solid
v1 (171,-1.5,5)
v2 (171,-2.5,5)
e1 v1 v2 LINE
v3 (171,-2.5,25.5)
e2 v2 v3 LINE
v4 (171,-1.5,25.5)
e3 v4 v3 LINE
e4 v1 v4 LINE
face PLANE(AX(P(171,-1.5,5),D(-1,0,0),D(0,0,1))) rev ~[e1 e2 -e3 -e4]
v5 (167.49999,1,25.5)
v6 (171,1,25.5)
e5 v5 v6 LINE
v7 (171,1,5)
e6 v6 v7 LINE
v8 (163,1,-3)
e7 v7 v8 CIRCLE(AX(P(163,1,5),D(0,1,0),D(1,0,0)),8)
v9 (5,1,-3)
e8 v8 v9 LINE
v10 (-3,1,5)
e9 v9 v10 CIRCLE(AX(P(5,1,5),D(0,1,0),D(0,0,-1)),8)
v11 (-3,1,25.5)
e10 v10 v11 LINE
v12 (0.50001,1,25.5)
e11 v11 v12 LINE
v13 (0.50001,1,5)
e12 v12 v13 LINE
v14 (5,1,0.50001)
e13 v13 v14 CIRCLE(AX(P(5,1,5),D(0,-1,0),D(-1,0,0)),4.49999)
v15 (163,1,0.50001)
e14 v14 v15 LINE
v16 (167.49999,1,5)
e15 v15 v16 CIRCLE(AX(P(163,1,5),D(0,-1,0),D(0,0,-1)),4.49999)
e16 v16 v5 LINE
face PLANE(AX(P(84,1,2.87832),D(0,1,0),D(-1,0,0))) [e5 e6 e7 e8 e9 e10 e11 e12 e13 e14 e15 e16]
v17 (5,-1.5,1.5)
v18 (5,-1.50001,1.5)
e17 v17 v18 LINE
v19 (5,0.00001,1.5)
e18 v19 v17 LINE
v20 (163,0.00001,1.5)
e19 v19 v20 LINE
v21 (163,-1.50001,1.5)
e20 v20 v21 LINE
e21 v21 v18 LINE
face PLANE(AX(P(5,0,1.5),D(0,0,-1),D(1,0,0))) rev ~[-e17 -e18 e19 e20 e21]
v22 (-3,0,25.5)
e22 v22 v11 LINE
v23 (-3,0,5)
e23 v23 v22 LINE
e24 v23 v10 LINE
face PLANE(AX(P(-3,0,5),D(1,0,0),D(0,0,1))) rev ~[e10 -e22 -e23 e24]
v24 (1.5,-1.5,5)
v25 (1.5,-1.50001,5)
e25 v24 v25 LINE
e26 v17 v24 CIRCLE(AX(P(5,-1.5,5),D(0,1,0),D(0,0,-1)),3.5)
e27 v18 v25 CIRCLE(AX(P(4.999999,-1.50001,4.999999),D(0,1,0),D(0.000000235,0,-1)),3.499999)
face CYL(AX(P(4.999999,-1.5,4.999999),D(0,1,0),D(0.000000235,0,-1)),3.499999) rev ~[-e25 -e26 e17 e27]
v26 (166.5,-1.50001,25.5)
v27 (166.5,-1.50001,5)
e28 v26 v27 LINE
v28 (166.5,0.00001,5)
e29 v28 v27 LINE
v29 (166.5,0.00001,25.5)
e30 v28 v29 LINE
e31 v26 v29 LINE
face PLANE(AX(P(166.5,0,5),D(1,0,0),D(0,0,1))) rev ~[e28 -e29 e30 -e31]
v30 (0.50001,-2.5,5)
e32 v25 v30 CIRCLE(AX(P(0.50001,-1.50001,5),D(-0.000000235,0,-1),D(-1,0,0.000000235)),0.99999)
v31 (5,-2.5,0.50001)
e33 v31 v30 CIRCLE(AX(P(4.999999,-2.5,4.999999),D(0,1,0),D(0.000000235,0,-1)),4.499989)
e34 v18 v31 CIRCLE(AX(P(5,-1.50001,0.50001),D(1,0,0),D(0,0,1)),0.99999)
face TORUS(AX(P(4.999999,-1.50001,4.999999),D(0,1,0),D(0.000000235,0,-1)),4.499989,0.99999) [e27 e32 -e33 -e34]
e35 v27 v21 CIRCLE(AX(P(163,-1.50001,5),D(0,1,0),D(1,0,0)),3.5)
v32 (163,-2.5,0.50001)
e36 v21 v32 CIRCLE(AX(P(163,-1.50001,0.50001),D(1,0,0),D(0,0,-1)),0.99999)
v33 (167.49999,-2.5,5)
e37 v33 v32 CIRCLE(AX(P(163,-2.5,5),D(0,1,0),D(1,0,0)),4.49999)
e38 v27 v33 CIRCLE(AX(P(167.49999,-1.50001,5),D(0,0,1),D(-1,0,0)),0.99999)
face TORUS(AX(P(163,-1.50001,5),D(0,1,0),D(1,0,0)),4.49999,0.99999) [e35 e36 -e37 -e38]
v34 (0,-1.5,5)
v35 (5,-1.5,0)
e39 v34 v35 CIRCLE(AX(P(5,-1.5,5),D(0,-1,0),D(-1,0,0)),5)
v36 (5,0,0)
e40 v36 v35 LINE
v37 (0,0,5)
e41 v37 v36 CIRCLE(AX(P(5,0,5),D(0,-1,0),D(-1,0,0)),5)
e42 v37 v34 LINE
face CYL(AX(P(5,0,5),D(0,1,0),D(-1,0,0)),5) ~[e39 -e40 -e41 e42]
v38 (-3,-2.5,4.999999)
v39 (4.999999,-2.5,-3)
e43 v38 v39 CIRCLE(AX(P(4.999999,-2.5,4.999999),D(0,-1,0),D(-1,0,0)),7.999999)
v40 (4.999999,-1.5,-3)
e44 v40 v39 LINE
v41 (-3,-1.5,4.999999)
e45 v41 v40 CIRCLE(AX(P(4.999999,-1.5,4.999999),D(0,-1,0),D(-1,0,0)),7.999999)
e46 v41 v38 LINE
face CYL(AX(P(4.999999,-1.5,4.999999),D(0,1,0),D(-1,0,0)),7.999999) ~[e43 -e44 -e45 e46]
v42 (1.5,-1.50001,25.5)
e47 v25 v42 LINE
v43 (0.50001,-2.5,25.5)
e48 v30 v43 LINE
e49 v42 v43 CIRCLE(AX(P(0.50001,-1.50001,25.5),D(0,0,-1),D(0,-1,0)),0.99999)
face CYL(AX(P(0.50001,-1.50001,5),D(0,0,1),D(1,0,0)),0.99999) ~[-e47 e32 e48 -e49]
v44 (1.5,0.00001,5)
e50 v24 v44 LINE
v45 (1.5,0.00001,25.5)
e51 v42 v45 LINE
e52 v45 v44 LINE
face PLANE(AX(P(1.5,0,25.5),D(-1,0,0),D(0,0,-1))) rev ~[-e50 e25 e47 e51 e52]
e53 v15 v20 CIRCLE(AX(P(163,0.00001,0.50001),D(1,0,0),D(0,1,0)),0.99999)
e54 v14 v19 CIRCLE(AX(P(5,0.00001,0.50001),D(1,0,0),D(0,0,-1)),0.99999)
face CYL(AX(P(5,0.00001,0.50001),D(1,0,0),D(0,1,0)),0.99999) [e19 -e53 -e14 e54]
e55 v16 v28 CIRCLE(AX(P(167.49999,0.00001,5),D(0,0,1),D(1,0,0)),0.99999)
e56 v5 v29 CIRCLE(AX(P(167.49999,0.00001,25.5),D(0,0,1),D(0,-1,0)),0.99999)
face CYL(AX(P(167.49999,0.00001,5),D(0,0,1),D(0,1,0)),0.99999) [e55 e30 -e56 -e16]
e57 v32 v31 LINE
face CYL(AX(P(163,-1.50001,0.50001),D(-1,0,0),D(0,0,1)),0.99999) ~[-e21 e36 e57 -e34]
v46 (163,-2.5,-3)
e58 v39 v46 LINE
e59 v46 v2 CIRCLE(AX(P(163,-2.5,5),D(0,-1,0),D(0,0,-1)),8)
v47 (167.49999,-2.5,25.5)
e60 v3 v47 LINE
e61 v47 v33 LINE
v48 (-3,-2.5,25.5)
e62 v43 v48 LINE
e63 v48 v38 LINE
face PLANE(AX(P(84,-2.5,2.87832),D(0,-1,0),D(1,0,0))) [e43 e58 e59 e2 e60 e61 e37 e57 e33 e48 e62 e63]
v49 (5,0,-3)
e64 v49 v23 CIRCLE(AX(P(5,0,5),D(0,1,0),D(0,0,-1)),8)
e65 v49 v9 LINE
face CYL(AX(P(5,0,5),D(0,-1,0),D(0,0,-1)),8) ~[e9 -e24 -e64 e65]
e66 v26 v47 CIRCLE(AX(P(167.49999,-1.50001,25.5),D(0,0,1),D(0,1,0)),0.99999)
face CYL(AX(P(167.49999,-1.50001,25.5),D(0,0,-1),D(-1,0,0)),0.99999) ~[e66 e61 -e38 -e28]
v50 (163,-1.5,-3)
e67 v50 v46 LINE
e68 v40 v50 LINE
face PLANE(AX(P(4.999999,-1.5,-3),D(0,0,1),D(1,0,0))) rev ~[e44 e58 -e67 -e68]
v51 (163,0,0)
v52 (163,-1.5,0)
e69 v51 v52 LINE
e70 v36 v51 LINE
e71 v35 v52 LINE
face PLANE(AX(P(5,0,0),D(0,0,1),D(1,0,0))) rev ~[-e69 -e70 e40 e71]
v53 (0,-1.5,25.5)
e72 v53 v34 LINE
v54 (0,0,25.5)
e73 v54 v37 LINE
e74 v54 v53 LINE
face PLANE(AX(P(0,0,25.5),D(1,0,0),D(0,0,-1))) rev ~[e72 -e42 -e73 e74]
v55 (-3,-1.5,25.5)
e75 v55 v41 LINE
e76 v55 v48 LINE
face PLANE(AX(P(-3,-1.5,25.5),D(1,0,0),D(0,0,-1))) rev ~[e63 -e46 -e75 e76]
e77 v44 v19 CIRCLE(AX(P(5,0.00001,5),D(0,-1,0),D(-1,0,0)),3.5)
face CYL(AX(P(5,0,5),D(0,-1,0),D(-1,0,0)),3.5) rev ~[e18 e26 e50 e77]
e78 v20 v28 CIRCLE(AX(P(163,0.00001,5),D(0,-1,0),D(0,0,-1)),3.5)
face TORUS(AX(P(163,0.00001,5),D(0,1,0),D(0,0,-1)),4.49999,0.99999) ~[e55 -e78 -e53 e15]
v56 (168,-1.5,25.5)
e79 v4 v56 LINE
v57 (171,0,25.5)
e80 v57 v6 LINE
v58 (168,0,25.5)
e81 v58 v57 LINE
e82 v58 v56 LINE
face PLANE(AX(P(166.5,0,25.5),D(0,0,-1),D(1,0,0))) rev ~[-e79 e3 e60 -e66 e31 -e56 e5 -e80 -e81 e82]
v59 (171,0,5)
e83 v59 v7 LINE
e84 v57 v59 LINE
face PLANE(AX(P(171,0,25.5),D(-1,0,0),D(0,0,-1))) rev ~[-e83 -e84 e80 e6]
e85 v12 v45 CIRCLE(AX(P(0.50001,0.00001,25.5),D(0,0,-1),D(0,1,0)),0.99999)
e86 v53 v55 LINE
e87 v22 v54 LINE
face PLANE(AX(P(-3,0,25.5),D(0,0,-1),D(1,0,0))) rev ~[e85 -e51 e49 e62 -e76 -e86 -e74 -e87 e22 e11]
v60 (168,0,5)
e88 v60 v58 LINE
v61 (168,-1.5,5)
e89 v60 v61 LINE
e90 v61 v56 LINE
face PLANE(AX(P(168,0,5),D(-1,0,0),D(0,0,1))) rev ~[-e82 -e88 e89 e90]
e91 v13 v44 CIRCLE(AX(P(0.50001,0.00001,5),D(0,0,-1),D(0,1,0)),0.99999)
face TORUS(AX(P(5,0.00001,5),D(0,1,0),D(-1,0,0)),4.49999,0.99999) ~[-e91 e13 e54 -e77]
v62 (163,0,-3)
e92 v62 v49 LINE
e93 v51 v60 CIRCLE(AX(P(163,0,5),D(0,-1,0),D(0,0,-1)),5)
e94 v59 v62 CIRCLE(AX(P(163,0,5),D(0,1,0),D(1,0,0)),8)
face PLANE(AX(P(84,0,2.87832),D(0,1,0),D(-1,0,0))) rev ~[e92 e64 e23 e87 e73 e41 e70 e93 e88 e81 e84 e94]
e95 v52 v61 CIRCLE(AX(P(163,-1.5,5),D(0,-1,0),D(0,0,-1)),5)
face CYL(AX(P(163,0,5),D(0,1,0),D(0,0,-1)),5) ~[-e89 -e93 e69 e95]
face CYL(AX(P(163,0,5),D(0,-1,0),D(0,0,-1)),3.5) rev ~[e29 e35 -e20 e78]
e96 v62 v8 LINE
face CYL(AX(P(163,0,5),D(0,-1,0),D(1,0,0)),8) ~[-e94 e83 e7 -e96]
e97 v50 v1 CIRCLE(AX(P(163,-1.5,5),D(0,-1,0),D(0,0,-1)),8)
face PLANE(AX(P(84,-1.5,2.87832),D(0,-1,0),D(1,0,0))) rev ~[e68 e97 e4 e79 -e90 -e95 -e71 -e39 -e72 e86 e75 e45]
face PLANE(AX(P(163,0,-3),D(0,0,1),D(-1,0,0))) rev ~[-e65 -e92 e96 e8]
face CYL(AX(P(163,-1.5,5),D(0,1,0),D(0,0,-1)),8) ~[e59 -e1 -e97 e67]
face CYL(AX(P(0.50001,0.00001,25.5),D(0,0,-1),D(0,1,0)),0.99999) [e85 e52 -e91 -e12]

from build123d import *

# Parameters (mm, degrees)
F1_DEPTH = 1.5
F3_DEPTH = 1
F5_DEPTH = 1
F6_R     = 0.99999


# Not quite as in the source:
# - a fillet or chamfer is up to 0.001 mm smaller than in the source, because OpenCascade refuses the exact size
# - ends of sketch curves that miss each other by under 0.0002 mm in the source are joined


with BuildPart() as f1:
    # F0 (on Front) → F1 (new body)
    with BuildSketch(Plane.XZ):
        with BuildLine():
            Line((1.5, 25.5), (0, 25.5))
            Line((0, 25.5), (0, 5))
            ThreePointArc((0, 5), (1.4644660941, 1.4644660941), (5, 0))
            Line((5, 0), (163, 0))
            ThreePointArc((163, 0), (166.5355339059, 1.4644660941), (168, 5))
            Line((168, 5), (168, 25.5))
            Line((168, 25.5), (166.5, 25.5))
            Line((166.5, 25.5), (166.5, 5))
            ThreePointArc((166.5, 5), (165.4748737342, 2.5251262658), (163, 1.5))
            Line((163, 1.5), (5, 1.5))
            ThreePointArc((5, 1.5), (2.5251262658, 2.5251262658), (1.5, 5))
            Line((1.5, 5), (1.5, 25.5))
        make_face()
    extrude(amount=F1_DEPTH)

    # F2 (on face) → F3 (join)
    with BuildSketch(Plane.XZ.offset(1.5)):
        with BuildLine():
            Line((1.5, 5), (1.5, 25.5))
            Line((1.5, 25.5), (-3, 25.5))
            Line((-3, 25.5), (-3, 4.9999991791))
            ThreePointArc((-3, 4.9999991791), (-0.6568544899, -0.6568544899), (4.9999991791, -3))
            Line((4.9999991791, -3), (163, -3))
            ThreePointArc((163, -3), (168.6568542495, -0.6568542495), (171, 5))
            Line((171, 5), (171, 25.5))
            Line((171, 25.5), (166.5, 25.5))
            Line((166.5, 25.5), (166.5, 5))
            ThreePointArc((166.5, 5), (165.4748737342, 2.5251262658), (163, 1.5))
            Line((163, 1.5), (5, 1.5))
            ThreePointArc((5, 1.5), (2.5251257352, 2.5251263156), (1.5, 5))
        make_face()
    extrude(amount=F3_DEPTH)

    # F4 (on face) → F5 (join)
    with BuildSketch(Plane(origin=(0, 0, 0), x_dir=(-1, 0, 0), z_dir=(0, 1, 0))):
        with BuildLine():
            Line((-166.5, 5), (-166.5, 25.5))
            Line((-166.5, 25.5), (-171, 25.5))
            Line((-171, 25.5), (-171, 5))
            ThreePointArc((-171, 5), (-168.6568542495, -0.6568542495), (-163, -3))
            Line((-163, -3), (-5, -3))
            ThreePointArc((-5, -3), (0.6568542495, -0.6568542495), (3, 5))
            Line((3, 5), (3, 25.5))
            Line((3, 25.5), (-1.5, 25.5))
            Line((-1.5, 25.5), (-1.5, 5))
            ThreePointArc((-1.5, 5), (-2.5251262658, 2.5251262658), (-5, 1.5))
            Line((-5, 1.5), (-163, 1.5))
            ThreePointArc((-163, 1.5), (-165.4748737342, 2.5251262658), (-166.5, 5))
        make_face()
    extrude(amount=F5_DEPTH)

    # F6 (radius 1 in the source; OpenCascade refuses exactly that, so slightly less here)
    f6_edges = [f1.edges().sort_by_distance(p)[0] for p in [
        (165.474874, 1, 2.525126),
        (166.5, -2.5, 15.25),
    ]]
    fillet(f6_edges, radius=F6_R)


solid = f1.part
